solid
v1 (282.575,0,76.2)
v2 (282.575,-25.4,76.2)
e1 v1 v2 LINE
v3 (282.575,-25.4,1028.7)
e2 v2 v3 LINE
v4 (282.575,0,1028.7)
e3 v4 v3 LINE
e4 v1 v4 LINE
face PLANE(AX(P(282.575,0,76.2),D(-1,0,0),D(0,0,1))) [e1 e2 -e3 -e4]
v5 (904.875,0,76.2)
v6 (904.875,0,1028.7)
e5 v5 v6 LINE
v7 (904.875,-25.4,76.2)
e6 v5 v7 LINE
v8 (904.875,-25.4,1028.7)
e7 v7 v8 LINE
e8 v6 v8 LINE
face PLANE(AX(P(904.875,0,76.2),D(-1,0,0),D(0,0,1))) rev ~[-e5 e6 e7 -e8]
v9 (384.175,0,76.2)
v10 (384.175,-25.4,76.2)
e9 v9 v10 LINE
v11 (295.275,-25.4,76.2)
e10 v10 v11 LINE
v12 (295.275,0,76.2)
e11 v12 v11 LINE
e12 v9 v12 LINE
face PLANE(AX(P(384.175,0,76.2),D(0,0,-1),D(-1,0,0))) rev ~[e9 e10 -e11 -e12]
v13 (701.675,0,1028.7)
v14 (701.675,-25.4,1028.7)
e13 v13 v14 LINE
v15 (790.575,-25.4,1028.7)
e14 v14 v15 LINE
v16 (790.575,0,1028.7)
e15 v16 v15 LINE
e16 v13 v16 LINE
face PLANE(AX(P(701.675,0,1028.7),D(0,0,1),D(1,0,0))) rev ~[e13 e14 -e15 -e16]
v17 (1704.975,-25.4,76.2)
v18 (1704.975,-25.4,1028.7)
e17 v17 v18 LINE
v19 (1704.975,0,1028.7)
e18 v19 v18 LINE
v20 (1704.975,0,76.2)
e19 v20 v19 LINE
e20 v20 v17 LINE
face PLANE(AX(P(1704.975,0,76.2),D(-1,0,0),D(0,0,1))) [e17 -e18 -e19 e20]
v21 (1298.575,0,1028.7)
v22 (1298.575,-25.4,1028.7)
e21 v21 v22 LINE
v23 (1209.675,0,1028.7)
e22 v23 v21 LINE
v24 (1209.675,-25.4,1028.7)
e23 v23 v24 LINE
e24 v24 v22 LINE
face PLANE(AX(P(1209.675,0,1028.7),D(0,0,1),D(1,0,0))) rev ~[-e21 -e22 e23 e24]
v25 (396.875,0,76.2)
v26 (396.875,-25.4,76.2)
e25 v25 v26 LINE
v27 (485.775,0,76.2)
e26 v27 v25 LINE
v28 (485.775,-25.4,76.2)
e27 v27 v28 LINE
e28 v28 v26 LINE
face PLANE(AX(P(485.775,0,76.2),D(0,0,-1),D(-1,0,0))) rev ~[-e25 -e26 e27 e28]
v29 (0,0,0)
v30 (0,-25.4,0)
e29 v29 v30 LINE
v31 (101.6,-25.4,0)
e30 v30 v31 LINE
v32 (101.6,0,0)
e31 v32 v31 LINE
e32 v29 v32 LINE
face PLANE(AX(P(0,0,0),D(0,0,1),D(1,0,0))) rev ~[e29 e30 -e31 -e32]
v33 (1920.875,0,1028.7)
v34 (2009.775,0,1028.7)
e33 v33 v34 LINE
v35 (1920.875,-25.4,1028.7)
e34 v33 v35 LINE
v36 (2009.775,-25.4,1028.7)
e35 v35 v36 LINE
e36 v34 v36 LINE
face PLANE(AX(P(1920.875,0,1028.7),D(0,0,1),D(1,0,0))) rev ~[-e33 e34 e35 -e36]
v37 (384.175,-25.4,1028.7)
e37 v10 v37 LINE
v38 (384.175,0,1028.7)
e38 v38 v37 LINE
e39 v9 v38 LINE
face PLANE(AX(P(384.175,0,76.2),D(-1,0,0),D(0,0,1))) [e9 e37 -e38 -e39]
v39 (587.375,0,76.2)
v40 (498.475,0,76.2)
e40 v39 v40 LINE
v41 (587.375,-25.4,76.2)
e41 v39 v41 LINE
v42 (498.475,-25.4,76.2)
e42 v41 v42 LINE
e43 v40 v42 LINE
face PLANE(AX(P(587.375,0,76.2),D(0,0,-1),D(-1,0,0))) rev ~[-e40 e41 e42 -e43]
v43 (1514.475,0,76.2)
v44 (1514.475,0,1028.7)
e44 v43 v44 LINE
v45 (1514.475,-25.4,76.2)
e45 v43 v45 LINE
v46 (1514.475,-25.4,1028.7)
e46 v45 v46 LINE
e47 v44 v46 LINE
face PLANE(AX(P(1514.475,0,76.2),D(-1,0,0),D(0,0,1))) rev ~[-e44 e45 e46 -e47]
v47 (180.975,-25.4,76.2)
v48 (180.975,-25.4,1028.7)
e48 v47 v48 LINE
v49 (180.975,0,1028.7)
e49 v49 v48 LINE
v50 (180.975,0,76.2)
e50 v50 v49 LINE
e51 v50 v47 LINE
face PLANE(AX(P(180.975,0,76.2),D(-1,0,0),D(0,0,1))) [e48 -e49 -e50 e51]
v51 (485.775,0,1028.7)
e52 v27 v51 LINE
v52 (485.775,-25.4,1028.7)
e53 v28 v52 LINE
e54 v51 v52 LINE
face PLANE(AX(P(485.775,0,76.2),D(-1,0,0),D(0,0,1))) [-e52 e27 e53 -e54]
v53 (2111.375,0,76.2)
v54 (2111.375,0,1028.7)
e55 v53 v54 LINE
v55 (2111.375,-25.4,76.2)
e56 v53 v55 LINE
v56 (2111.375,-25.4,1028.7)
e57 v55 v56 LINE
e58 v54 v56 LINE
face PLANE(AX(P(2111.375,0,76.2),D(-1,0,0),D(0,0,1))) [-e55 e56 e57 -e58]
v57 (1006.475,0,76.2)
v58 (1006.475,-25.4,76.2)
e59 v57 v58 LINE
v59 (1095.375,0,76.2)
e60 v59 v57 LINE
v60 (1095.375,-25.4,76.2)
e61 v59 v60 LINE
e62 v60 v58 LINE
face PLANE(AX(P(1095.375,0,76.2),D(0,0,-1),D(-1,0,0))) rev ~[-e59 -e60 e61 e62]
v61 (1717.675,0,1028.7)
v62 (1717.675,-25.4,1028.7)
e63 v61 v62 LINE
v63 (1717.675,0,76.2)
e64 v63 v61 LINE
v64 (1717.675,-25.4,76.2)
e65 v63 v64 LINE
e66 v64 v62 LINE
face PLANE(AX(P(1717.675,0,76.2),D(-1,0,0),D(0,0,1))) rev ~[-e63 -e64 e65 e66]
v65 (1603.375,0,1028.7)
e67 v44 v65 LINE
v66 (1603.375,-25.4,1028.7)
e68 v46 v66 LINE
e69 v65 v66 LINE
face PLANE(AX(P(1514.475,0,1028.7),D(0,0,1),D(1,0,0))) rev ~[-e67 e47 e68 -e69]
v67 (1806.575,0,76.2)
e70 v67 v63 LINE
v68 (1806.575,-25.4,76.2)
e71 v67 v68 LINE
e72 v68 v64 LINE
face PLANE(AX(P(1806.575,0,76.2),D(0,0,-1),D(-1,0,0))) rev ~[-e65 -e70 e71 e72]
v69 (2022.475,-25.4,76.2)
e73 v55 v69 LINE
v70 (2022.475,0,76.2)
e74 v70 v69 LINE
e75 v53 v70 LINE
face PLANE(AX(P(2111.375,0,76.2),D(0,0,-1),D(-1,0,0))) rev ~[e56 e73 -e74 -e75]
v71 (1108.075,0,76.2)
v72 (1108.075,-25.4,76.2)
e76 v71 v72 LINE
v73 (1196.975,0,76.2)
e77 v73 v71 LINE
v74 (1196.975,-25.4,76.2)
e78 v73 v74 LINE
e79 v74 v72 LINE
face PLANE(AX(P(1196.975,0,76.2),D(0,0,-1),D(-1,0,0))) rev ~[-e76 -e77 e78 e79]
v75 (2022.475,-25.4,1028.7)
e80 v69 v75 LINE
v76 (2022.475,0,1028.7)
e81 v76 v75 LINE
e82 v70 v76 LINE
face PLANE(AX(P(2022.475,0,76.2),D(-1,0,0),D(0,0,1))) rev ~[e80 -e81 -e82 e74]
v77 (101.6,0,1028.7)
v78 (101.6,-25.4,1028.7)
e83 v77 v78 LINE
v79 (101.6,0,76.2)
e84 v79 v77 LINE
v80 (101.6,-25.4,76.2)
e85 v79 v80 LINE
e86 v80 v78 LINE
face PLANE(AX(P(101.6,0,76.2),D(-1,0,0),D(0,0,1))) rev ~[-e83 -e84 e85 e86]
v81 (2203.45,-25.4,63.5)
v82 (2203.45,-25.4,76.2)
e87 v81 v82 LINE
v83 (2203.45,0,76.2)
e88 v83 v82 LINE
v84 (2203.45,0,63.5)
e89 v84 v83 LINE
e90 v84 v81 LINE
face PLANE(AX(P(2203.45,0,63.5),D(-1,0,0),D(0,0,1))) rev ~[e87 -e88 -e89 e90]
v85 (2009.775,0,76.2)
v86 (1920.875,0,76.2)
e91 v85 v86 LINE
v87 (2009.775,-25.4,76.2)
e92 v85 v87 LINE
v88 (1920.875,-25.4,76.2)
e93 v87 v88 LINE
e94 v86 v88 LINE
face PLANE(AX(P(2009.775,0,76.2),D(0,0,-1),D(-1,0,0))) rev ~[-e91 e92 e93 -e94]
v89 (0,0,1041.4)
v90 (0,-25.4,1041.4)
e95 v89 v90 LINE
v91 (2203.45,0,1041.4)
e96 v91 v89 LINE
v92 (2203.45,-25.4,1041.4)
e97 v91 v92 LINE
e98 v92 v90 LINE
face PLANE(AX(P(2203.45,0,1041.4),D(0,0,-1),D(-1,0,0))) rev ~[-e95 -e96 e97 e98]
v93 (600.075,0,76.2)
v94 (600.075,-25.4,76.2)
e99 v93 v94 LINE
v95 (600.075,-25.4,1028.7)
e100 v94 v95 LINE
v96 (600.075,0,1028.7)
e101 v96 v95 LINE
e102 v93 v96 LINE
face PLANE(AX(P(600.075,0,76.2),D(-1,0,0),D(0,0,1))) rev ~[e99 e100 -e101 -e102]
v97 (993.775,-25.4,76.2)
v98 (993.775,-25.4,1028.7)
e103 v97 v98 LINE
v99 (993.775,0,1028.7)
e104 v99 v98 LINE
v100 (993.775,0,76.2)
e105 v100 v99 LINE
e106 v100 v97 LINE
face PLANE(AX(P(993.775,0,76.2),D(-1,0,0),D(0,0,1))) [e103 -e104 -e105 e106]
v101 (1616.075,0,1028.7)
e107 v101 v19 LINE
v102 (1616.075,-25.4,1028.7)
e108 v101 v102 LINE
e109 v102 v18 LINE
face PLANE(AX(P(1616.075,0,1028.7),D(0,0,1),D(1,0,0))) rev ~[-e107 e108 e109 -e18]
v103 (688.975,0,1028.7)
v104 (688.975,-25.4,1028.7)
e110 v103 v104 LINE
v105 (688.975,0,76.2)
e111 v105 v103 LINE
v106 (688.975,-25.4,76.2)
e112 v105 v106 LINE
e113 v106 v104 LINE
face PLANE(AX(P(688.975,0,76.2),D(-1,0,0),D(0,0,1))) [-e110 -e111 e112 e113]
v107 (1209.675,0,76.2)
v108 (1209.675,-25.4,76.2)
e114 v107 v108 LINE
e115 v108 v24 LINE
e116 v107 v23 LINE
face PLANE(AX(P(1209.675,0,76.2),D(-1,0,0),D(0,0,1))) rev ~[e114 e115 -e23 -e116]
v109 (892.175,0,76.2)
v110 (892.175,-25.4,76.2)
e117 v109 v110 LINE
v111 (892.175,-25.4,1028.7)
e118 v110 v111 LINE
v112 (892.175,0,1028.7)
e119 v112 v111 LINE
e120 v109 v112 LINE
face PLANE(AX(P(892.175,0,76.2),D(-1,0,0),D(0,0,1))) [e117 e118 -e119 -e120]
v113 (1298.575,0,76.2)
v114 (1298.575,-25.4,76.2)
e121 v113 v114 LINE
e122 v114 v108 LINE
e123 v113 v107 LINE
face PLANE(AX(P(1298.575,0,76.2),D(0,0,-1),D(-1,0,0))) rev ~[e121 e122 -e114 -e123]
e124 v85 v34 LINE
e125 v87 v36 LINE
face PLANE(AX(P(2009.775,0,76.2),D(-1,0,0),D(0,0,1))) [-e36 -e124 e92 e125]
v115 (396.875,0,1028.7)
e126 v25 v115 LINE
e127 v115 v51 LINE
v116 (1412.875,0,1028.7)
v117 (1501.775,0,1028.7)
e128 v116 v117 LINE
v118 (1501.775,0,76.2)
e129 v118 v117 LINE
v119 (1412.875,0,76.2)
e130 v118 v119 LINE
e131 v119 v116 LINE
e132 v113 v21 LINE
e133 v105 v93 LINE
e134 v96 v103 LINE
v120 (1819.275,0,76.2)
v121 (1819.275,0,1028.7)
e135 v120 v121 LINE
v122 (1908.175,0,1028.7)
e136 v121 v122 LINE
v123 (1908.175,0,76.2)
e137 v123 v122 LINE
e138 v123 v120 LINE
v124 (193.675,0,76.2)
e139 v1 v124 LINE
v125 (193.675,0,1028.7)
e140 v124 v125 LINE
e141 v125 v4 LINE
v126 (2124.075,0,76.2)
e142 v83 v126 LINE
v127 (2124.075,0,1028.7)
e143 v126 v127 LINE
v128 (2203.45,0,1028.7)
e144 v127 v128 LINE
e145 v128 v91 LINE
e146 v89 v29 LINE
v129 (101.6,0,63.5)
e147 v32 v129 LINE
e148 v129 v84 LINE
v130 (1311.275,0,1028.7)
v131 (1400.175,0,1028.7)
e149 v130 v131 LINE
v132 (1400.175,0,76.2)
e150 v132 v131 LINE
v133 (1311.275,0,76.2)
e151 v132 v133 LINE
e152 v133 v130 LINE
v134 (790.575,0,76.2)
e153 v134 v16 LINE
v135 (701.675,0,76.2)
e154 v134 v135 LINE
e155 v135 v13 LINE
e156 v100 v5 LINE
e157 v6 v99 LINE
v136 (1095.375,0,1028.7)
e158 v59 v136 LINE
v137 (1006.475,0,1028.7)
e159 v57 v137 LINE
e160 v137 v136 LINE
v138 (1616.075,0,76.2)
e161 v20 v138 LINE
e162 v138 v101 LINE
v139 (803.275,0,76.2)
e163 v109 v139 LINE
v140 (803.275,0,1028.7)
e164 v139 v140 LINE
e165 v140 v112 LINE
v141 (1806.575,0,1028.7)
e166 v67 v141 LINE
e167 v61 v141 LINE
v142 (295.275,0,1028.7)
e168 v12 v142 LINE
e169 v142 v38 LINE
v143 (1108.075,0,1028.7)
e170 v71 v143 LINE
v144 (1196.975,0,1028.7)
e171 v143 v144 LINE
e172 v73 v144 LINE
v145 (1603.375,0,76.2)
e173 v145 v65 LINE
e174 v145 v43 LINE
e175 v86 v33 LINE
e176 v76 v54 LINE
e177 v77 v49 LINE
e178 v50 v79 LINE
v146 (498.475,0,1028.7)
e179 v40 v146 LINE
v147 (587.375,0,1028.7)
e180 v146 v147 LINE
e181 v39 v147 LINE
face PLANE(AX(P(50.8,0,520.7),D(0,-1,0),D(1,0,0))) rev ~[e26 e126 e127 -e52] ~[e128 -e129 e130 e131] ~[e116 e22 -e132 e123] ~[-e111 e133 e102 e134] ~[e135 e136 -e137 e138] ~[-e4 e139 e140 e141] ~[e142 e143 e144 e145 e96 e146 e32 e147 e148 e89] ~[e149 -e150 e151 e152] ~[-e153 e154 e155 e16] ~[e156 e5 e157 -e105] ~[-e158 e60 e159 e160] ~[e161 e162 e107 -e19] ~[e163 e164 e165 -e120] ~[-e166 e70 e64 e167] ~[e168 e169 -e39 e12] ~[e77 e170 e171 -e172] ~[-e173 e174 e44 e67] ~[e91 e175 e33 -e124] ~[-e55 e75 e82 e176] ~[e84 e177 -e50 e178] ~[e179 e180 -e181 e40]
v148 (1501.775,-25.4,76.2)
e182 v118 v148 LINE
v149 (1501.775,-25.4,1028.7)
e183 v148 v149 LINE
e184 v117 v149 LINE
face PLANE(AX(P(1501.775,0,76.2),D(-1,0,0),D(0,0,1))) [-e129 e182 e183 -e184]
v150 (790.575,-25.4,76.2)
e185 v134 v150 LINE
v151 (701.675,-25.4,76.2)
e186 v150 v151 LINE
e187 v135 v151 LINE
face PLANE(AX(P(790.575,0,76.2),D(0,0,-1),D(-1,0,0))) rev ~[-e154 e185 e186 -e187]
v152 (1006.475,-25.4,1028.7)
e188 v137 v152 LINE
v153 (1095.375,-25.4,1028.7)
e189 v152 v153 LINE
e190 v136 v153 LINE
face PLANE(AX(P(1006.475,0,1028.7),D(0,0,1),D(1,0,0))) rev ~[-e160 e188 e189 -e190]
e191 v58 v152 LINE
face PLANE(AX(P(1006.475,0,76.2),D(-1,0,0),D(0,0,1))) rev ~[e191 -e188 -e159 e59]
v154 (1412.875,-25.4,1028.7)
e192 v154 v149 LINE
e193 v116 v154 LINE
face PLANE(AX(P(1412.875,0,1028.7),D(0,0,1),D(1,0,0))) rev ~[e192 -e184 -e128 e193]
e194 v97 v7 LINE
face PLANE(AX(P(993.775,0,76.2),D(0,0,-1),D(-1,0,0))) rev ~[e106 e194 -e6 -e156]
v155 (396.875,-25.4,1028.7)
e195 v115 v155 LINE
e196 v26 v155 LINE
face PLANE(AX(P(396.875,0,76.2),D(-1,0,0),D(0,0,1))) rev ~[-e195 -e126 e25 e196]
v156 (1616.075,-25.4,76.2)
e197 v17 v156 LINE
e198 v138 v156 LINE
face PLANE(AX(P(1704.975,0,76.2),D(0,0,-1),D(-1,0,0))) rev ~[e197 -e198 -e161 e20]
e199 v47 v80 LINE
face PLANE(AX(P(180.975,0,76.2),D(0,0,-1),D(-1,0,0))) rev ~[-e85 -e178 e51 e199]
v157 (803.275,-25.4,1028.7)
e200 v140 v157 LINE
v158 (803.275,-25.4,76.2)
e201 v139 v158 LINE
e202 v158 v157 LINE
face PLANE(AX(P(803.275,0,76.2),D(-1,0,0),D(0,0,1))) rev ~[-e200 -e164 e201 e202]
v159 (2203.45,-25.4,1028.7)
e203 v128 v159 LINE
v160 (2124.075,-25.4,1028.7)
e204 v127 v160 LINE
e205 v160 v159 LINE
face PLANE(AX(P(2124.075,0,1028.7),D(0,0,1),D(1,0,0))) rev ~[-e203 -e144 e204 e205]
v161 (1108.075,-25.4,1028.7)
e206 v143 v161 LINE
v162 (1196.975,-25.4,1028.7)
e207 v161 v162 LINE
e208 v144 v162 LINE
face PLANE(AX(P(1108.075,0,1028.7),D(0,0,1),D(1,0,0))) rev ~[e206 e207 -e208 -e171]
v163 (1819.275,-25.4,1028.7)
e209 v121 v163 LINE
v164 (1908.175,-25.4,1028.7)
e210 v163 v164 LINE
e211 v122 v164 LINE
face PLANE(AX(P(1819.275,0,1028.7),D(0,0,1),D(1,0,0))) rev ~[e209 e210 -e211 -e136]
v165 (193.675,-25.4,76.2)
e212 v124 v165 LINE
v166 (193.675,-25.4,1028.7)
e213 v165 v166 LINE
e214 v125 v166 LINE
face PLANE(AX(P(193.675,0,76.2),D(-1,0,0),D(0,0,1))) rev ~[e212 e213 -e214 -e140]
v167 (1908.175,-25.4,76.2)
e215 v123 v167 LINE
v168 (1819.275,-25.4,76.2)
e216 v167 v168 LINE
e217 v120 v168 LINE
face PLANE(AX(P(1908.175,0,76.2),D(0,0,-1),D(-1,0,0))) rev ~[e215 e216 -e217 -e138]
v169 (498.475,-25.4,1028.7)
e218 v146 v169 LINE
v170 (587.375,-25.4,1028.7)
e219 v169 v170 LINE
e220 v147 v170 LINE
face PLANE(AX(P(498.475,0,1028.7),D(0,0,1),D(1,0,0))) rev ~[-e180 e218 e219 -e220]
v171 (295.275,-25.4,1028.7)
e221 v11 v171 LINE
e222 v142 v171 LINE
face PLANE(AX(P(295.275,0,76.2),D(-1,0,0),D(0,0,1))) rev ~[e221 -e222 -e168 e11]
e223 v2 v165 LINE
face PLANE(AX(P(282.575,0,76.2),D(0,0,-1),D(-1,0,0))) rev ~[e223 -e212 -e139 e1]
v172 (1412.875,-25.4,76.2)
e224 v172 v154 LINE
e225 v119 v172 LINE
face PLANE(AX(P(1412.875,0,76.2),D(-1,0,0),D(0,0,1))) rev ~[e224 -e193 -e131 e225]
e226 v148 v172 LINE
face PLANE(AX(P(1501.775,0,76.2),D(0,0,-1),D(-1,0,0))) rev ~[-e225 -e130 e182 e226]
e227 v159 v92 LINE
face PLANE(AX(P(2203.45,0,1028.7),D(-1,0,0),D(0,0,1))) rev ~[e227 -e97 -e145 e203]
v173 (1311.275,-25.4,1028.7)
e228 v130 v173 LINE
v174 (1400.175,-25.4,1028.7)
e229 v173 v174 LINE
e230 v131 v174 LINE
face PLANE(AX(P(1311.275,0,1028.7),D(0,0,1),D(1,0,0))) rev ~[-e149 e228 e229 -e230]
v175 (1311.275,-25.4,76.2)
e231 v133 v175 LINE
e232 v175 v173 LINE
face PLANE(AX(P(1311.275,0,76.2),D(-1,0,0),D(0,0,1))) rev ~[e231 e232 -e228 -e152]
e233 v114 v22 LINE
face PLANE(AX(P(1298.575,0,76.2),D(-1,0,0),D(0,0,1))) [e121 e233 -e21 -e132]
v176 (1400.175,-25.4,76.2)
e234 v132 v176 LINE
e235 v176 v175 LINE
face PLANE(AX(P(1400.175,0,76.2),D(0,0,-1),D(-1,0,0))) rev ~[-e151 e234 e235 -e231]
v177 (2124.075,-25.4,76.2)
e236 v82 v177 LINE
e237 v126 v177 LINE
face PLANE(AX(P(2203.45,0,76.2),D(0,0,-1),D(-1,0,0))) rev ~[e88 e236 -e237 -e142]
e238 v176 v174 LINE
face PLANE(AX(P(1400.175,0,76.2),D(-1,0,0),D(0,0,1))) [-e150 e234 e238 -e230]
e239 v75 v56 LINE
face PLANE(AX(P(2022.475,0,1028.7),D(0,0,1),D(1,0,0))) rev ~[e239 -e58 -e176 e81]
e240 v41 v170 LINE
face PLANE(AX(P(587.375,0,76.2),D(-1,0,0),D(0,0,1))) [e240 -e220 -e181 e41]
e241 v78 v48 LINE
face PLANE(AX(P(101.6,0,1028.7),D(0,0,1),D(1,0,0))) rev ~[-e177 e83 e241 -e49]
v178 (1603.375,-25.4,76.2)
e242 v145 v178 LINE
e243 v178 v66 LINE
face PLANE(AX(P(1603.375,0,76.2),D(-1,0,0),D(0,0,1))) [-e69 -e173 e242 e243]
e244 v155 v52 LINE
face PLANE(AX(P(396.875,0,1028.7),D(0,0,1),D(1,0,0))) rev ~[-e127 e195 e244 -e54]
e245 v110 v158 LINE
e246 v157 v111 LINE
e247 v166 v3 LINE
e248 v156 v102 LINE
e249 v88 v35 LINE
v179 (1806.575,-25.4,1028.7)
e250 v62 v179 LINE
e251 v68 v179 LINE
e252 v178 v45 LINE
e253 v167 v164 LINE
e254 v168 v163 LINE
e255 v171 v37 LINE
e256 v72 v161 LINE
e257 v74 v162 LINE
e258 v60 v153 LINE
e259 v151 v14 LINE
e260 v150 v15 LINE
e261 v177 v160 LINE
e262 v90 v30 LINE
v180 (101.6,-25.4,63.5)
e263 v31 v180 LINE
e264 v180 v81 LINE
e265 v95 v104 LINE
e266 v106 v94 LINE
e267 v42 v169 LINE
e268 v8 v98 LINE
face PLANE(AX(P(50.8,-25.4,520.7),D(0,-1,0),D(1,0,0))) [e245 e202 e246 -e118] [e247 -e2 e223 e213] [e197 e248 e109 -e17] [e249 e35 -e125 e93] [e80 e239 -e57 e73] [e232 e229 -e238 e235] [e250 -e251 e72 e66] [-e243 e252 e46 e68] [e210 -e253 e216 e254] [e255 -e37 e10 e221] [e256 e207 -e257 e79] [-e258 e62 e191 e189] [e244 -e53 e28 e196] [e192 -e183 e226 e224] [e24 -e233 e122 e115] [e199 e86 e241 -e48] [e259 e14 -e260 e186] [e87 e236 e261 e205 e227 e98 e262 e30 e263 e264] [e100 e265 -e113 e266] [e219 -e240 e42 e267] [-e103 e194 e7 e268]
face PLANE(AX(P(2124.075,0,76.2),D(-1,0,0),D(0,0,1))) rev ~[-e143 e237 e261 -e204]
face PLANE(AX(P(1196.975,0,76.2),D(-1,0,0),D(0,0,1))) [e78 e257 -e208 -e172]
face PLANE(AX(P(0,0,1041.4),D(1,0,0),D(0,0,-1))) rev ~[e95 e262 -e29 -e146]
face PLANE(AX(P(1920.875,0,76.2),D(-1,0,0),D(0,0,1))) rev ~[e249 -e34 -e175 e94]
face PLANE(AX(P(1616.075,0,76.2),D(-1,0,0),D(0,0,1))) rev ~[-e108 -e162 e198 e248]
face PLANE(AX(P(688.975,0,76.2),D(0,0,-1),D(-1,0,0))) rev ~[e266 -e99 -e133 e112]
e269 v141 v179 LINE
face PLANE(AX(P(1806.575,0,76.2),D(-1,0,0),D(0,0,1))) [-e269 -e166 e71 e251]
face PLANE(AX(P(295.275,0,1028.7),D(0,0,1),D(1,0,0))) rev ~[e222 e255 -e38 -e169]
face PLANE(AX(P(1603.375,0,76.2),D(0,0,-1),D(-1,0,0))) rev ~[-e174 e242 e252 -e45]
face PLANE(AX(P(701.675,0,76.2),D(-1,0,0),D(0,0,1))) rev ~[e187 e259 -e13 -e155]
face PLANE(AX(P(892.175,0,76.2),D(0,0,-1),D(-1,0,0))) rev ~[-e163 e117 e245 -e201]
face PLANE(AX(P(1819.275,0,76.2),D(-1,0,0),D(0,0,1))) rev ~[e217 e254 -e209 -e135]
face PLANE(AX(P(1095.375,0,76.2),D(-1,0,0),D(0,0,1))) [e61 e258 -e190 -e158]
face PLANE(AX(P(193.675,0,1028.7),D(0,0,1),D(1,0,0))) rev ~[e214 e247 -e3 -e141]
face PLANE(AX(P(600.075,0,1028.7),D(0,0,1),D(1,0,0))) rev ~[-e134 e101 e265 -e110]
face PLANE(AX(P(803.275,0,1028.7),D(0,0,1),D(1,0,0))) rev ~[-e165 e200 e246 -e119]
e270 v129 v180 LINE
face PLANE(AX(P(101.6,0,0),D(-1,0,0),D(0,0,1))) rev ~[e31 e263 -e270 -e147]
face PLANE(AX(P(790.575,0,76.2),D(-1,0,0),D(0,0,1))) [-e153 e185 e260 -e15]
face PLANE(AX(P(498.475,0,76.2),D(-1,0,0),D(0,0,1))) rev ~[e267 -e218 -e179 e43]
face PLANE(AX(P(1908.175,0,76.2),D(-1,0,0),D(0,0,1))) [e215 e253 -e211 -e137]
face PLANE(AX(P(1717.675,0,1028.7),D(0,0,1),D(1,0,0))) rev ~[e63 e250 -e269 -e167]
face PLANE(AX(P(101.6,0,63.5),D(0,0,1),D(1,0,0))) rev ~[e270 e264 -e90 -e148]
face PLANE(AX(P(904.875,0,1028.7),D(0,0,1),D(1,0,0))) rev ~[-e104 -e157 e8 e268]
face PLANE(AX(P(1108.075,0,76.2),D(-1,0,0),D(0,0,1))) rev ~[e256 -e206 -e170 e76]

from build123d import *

# Parameters (mm, degrees)
F0_W     = 12.7
F0_H     = 952.5
F1_DEPTH = 25.4


# Not quite as in the source:
# - a feature names something its author has since deleted; it is built from what else it names


with BuildPart() as f1:
    # F0 (on Front) → F1 (new body)
    with BuildSketch(Plane.XZ):
        Polygon((0, 1041.4), (0, 0), (101.6, 0), (101.6, 63.5), (101.6, 76.2), (101.6, 1028.7), (101.6, 1041.4), align=None)
        Polygon((101.6, 76.2), (101.6, 63.5), (2203.45, 63.5), (2203.45, 76.2), (2124.075, 76.2), (2111.375, 76.2), (2022.475, 76.2), (2009.775, 76.2), (1920.875, 76.2), (1908.175, 76.2), (1819.275, 76.2), (1806.575, 76.2), (1717.675, 76.2), (1704.975, 76.2), (1616.075, 76.2), (1603.375, 76.2), (1514.475, 76.2), (1501.775, 76.2), (1412.875, 76.2), (1400.175, 76.2), (1311.275, 76.2), (1298.575, 76.2), (1209.675, 76.2), (1196.975, 76.2), (1108.075, 76.2), (1095.375, 76.2), (1006.475, 76.2), (993.775, 76.2), (904.875, 76.2), (892.175, 76.2), (803.275, 76.2), (790.575, 76.2), (701.675, 76.2), (688.975, 76.2), (600.075, 76.2), (587.375, 76.2), (498.475, 76.2), (485.775, 76.2), (396.875, 76.2), (384.175, 76.2), (295.275, 76.2), (282.575, 76.2), (193.675, 76.2), (180.975, 76.2), align=None)
        with Locations((187.325, 552.45)):
            Rectangle(F0_W, F0_H)
        with Locations((288.925, 552.45)):
            Rectangle(F0_W, F0_H)
        with Locations((390.525, 552.45)):
            Rectangle(F0_W, F0_H)
        with Locations((492.125, 552.45)):
            Rectangle(F0_W, F0_H)
        with Locations((593.725, 552.45)):
            Rectangle(F0_W, F0_H)
        with Locations((695.325, 552.45)):
            Rectangle(F0_W, F0_H)
        with Locations((796.925, 552.45)):
            Rectangle(F0_W, F0_H)
        with Locations((898.525, 552.45)):
            Rectangle(F0_W, F0_H)
        with Locations((1000.125, 552.45)):
            Rectangle(F0_W, F0_H)
        with Locations((1101.725, 552.45)):
            Rectangle(F0_W, F0_H)
        with Locations((1203.325, 552.45)):
            Rectangle(F0_W, F0_H)
        with Locations((1304.925, 552.45)):
            Rectangle(F0_W, F0_H)
        with Locations((1406.525, 552.45)):
            Rectangle(F0_W, F0_H)
        with Locations((1508.125, 552.45)):
            Rectangle(F0_W, F0_H)
        with Locations((1609.725, 552.45)):
            Rectangle(F0_W, F0_H)
        with Locations((1711.325, 552.45)):
            Rectangle(F0_W, F0_H)
        with Locations((1812.925, 552.45)):
            Rectangle(F0_W, F0_H)
        with Locations((1914.525, 552.45)):
            Rectangle(F0_W, F0_H)
        Polygon((2203.45, 1041.4), (101.6, 1041.4), (101.6, 1028.7), (180.975, 1028.7), (193.675, 1028.7), (282.575, 1028.7), (295.275, 1028.7), (384.175, 1028.7), (396.875, 1028.7), (485.775, 1028.7), (498.475, 1028.7), (587.375, 1028.7), (600.075, 1028.7), (688.975, 1028.7), (701.675, 1028.7), (790.575, 1028.7), (803.275, 1028.7), (892.175, 1028.7), (904.875, 1028.7), (993.775, 1028.7), (1006.475, 1028.7), (1095.375, 1028.7), (1108.075, 1028.7), (1196.975, 1028.7), (1209.675, 1028.7), (1298.575, 1028.7), (1311.275, 1028.7), (1400.175, 1028.7), (1412.875, 1028.7), (1501.775, 1028.7), (1514.475, 1028.7), (1603.375, 1028.7), (1616.075, 1028.7), (1704.975, 1028.7), (1717.675, 1028.7), (1806.575, 1028.7), (1819.275, 1028.7), (1908.175, 1028.7), (1920.875, 1028.7), (2009.775, 1028.7), (2022.475, 1028.7), (2111.375, 1028.7), (2124.075, 1028.7), (2203.45, 1028.7), align=None)
        with Locations((2016.125, 552.45)):
            Rectangle(F0_W, F0_H)
        with Locations((2117.725, 552.45)):
            Rectangle(F0_W, F0_H)
    extrude(amount=F1_DEPTH)


solid = f1.part
